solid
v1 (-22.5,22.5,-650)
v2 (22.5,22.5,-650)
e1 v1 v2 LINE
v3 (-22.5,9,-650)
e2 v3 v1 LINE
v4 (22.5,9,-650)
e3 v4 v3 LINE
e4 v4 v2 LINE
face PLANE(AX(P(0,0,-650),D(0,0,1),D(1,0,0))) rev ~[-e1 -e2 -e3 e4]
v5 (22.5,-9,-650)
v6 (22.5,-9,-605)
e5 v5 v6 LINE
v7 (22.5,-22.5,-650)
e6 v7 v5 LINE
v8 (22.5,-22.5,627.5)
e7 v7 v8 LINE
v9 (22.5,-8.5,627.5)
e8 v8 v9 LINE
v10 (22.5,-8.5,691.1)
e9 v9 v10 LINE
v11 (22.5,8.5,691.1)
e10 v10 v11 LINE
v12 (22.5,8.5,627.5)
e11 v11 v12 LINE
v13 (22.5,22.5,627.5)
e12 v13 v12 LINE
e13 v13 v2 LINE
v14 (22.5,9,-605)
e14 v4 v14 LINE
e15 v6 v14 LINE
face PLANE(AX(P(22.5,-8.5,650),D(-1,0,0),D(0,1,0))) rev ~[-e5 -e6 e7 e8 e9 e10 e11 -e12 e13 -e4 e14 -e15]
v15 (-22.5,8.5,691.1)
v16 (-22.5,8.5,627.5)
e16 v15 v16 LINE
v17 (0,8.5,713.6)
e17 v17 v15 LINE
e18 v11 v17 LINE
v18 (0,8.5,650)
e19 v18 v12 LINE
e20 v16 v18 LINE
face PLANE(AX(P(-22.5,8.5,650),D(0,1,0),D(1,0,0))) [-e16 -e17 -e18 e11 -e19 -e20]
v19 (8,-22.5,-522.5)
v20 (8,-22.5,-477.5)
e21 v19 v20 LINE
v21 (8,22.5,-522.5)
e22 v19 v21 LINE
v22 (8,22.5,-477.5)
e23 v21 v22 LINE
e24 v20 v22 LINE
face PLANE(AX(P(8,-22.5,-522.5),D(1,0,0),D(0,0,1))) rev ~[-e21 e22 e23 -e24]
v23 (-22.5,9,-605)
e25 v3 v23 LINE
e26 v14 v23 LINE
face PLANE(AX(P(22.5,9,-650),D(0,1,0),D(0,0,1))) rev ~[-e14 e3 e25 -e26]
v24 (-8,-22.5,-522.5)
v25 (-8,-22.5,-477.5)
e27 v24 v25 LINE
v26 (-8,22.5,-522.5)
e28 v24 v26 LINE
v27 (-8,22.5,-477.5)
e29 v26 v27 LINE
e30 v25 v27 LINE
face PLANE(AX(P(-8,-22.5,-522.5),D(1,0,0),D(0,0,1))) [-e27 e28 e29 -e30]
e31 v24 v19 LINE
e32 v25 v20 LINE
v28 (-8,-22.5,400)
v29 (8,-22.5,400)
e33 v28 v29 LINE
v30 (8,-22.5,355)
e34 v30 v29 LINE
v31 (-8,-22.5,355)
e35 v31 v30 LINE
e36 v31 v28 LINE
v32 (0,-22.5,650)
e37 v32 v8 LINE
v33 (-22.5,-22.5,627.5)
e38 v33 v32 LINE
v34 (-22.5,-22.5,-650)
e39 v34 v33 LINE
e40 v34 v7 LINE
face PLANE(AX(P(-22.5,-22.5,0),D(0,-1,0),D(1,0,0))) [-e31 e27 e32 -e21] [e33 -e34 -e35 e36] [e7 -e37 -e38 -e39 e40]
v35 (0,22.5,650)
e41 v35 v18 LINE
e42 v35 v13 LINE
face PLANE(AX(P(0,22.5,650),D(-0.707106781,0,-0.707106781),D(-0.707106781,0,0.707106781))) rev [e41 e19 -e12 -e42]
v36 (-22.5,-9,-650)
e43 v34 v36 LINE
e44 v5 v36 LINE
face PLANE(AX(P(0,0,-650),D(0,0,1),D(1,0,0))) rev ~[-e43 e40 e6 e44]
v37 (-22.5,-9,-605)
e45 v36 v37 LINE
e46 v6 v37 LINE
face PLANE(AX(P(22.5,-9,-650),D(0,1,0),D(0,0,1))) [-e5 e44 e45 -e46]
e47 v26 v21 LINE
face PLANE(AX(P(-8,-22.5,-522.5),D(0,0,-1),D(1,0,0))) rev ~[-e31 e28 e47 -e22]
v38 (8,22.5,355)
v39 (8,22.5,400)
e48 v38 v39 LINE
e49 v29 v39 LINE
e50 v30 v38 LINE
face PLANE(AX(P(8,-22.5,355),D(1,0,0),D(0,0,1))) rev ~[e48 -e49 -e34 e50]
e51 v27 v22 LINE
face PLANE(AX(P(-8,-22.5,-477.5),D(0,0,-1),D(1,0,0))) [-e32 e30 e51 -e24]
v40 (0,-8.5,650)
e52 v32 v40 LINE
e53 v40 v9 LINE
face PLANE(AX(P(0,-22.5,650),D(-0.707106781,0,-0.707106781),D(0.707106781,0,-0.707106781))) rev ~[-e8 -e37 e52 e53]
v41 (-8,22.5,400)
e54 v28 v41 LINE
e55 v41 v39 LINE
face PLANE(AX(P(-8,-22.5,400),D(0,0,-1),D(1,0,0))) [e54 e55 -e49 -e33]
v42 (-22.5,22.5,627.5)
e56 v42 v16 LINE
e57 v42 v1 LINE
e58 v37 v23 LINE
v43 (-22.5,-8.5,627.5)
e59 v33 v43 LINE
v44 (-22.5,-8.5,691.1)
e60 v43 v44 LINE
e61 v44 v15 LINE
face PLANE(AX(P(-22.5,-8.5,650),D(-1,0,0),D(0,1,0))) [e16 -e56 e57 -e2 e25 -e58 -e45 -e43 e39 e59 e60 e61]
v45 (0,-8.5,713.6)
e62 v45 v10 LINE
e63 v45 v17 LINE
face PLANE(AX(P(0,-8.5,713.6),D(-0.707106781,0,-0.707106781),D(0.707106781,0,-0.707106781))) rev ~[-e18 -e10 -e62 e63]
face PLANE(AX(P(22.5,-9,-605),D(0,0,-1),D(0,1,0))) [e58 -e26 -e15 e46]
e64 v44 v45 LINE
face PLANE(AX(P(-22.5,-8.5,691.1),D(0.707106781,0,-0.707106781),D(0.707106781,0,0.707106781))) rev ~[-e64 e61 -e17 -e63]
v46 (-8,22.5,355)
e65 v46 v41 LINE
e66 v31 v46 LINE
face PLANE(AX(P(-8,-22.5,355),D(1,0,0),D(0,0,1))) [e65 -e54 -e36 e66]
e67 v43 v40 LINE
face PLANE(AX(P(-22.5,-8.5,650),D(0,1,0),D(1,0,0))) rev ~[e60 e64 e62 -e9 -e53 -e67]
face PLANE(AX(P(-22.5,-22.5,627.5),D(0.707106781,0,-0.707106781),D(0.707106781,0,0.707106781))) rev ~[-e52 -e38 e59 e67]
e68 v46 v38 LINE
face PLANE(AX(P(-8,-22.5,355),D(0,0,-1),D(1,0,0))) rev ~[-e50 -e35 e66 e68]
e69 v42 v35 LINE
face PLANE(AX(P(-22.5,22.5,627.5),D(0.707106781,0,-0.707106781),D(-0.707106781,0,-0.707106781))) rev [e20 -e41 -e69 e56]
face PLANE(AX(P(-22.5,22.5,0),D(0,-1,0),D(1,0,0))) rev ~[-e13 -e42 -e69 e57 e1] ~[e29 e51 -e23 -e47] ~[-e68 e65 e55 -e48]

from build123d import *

# Parameters (mm, degrees)
F0_W      = 45
F0_H      = 45
F1_DEPTH  = 650
F3_DEPTH  = 14
F4_W      = 16
F4_H      = 45
F5_DEPTH  = 45.001
F6_W      = 18
F6_H      = 45
F7_DEPTH  = 45.001
F8_W      = 16
F8_H      = 45
F9_DEPTH  = 45.001
F10_W     = 45
F10_H     = 17
F11_DEPTH = 63.6
F13_DEPTH = 31.001


# Not quite as in the source:
# - a pattern or mirror of a feature is missing from the dataset's text; its kind, count and spacing are read off the source's solid


with BuildPart() as f1:
    # F0 (on Top) → F1 (new body, symmetric)
    with BuildSketch(Plane.XY):
        Rectangle(F0_W, F0_H)
    extrude(amount=F1_DEPTH, both=True)

    # F2 (on face) → F3 (cut)
    with BuildSketch(Plane.XZ.offset(22.5)):
        Polygon((22.5, 650), (0, 650), (22.5, 627.5), align=None)
        Polygon((-22.5, 627.5), (0, 650), (-22.5, 650), align=None)
    f3 = extrude(amount=-F3_DEPTH, mode=Mode.SUBTRACT)

    # F3_copies: F3 across plane
    add(f3.mirror(Plane.ZX), mode=Mode.SUBTRACT)

    # F4 (on face) → F5 (cut, through all)
    with BuildSketch(Plane.XZ.offset(22.5)):
        with Locations((0, -500)):
            Rectangle(F4_W, F4_H)
    extrude(amount=-F5_DEPTH, mode=Mode.SUBTRACT)

    # F6 (on face) → F7 (cut, through all)
    with BuildSketch(Plane.YZ.offset(22.5)):
        with Locations((0, -627.5)):
            Rectangle(F6_W, F6_H)
    extrude(amount=-F7_DEPTH, mode=Mode.SUBTRACT)

    # F8 (on face) → F9 (cut, through all)
    with BuildSketch(Plane.XZ.offset(22.5)):
        with Locations((0, 377.5)):
            Rectangle(F8_W, F8_H)
    extrude(amount=-F9_DEPTH, mode=Mode.SUBTRACT)

    # F10 (on face) → F11 (join)
    with BuildSketch(Plane.XY.offset(650)):
        Rectangle(F10_W, F10_H)
    extrude(amount=F11_DEPTH)

    # F12 (on face) → F13 (cut, through all)
    with BuildSketch(Plane.XZ.offset(8.5)):
        Polygon((-22.5, 691.1), (0, 713.6), (-22.5, 713.6), align=None)
        Polygon((22.5, 713.6), (0, 713.6), (22.5, 691.1), align=None)
    extrude(amount=-F13_DEPTH, mode=Mode.SUBTRACT)


solid = f1.part
